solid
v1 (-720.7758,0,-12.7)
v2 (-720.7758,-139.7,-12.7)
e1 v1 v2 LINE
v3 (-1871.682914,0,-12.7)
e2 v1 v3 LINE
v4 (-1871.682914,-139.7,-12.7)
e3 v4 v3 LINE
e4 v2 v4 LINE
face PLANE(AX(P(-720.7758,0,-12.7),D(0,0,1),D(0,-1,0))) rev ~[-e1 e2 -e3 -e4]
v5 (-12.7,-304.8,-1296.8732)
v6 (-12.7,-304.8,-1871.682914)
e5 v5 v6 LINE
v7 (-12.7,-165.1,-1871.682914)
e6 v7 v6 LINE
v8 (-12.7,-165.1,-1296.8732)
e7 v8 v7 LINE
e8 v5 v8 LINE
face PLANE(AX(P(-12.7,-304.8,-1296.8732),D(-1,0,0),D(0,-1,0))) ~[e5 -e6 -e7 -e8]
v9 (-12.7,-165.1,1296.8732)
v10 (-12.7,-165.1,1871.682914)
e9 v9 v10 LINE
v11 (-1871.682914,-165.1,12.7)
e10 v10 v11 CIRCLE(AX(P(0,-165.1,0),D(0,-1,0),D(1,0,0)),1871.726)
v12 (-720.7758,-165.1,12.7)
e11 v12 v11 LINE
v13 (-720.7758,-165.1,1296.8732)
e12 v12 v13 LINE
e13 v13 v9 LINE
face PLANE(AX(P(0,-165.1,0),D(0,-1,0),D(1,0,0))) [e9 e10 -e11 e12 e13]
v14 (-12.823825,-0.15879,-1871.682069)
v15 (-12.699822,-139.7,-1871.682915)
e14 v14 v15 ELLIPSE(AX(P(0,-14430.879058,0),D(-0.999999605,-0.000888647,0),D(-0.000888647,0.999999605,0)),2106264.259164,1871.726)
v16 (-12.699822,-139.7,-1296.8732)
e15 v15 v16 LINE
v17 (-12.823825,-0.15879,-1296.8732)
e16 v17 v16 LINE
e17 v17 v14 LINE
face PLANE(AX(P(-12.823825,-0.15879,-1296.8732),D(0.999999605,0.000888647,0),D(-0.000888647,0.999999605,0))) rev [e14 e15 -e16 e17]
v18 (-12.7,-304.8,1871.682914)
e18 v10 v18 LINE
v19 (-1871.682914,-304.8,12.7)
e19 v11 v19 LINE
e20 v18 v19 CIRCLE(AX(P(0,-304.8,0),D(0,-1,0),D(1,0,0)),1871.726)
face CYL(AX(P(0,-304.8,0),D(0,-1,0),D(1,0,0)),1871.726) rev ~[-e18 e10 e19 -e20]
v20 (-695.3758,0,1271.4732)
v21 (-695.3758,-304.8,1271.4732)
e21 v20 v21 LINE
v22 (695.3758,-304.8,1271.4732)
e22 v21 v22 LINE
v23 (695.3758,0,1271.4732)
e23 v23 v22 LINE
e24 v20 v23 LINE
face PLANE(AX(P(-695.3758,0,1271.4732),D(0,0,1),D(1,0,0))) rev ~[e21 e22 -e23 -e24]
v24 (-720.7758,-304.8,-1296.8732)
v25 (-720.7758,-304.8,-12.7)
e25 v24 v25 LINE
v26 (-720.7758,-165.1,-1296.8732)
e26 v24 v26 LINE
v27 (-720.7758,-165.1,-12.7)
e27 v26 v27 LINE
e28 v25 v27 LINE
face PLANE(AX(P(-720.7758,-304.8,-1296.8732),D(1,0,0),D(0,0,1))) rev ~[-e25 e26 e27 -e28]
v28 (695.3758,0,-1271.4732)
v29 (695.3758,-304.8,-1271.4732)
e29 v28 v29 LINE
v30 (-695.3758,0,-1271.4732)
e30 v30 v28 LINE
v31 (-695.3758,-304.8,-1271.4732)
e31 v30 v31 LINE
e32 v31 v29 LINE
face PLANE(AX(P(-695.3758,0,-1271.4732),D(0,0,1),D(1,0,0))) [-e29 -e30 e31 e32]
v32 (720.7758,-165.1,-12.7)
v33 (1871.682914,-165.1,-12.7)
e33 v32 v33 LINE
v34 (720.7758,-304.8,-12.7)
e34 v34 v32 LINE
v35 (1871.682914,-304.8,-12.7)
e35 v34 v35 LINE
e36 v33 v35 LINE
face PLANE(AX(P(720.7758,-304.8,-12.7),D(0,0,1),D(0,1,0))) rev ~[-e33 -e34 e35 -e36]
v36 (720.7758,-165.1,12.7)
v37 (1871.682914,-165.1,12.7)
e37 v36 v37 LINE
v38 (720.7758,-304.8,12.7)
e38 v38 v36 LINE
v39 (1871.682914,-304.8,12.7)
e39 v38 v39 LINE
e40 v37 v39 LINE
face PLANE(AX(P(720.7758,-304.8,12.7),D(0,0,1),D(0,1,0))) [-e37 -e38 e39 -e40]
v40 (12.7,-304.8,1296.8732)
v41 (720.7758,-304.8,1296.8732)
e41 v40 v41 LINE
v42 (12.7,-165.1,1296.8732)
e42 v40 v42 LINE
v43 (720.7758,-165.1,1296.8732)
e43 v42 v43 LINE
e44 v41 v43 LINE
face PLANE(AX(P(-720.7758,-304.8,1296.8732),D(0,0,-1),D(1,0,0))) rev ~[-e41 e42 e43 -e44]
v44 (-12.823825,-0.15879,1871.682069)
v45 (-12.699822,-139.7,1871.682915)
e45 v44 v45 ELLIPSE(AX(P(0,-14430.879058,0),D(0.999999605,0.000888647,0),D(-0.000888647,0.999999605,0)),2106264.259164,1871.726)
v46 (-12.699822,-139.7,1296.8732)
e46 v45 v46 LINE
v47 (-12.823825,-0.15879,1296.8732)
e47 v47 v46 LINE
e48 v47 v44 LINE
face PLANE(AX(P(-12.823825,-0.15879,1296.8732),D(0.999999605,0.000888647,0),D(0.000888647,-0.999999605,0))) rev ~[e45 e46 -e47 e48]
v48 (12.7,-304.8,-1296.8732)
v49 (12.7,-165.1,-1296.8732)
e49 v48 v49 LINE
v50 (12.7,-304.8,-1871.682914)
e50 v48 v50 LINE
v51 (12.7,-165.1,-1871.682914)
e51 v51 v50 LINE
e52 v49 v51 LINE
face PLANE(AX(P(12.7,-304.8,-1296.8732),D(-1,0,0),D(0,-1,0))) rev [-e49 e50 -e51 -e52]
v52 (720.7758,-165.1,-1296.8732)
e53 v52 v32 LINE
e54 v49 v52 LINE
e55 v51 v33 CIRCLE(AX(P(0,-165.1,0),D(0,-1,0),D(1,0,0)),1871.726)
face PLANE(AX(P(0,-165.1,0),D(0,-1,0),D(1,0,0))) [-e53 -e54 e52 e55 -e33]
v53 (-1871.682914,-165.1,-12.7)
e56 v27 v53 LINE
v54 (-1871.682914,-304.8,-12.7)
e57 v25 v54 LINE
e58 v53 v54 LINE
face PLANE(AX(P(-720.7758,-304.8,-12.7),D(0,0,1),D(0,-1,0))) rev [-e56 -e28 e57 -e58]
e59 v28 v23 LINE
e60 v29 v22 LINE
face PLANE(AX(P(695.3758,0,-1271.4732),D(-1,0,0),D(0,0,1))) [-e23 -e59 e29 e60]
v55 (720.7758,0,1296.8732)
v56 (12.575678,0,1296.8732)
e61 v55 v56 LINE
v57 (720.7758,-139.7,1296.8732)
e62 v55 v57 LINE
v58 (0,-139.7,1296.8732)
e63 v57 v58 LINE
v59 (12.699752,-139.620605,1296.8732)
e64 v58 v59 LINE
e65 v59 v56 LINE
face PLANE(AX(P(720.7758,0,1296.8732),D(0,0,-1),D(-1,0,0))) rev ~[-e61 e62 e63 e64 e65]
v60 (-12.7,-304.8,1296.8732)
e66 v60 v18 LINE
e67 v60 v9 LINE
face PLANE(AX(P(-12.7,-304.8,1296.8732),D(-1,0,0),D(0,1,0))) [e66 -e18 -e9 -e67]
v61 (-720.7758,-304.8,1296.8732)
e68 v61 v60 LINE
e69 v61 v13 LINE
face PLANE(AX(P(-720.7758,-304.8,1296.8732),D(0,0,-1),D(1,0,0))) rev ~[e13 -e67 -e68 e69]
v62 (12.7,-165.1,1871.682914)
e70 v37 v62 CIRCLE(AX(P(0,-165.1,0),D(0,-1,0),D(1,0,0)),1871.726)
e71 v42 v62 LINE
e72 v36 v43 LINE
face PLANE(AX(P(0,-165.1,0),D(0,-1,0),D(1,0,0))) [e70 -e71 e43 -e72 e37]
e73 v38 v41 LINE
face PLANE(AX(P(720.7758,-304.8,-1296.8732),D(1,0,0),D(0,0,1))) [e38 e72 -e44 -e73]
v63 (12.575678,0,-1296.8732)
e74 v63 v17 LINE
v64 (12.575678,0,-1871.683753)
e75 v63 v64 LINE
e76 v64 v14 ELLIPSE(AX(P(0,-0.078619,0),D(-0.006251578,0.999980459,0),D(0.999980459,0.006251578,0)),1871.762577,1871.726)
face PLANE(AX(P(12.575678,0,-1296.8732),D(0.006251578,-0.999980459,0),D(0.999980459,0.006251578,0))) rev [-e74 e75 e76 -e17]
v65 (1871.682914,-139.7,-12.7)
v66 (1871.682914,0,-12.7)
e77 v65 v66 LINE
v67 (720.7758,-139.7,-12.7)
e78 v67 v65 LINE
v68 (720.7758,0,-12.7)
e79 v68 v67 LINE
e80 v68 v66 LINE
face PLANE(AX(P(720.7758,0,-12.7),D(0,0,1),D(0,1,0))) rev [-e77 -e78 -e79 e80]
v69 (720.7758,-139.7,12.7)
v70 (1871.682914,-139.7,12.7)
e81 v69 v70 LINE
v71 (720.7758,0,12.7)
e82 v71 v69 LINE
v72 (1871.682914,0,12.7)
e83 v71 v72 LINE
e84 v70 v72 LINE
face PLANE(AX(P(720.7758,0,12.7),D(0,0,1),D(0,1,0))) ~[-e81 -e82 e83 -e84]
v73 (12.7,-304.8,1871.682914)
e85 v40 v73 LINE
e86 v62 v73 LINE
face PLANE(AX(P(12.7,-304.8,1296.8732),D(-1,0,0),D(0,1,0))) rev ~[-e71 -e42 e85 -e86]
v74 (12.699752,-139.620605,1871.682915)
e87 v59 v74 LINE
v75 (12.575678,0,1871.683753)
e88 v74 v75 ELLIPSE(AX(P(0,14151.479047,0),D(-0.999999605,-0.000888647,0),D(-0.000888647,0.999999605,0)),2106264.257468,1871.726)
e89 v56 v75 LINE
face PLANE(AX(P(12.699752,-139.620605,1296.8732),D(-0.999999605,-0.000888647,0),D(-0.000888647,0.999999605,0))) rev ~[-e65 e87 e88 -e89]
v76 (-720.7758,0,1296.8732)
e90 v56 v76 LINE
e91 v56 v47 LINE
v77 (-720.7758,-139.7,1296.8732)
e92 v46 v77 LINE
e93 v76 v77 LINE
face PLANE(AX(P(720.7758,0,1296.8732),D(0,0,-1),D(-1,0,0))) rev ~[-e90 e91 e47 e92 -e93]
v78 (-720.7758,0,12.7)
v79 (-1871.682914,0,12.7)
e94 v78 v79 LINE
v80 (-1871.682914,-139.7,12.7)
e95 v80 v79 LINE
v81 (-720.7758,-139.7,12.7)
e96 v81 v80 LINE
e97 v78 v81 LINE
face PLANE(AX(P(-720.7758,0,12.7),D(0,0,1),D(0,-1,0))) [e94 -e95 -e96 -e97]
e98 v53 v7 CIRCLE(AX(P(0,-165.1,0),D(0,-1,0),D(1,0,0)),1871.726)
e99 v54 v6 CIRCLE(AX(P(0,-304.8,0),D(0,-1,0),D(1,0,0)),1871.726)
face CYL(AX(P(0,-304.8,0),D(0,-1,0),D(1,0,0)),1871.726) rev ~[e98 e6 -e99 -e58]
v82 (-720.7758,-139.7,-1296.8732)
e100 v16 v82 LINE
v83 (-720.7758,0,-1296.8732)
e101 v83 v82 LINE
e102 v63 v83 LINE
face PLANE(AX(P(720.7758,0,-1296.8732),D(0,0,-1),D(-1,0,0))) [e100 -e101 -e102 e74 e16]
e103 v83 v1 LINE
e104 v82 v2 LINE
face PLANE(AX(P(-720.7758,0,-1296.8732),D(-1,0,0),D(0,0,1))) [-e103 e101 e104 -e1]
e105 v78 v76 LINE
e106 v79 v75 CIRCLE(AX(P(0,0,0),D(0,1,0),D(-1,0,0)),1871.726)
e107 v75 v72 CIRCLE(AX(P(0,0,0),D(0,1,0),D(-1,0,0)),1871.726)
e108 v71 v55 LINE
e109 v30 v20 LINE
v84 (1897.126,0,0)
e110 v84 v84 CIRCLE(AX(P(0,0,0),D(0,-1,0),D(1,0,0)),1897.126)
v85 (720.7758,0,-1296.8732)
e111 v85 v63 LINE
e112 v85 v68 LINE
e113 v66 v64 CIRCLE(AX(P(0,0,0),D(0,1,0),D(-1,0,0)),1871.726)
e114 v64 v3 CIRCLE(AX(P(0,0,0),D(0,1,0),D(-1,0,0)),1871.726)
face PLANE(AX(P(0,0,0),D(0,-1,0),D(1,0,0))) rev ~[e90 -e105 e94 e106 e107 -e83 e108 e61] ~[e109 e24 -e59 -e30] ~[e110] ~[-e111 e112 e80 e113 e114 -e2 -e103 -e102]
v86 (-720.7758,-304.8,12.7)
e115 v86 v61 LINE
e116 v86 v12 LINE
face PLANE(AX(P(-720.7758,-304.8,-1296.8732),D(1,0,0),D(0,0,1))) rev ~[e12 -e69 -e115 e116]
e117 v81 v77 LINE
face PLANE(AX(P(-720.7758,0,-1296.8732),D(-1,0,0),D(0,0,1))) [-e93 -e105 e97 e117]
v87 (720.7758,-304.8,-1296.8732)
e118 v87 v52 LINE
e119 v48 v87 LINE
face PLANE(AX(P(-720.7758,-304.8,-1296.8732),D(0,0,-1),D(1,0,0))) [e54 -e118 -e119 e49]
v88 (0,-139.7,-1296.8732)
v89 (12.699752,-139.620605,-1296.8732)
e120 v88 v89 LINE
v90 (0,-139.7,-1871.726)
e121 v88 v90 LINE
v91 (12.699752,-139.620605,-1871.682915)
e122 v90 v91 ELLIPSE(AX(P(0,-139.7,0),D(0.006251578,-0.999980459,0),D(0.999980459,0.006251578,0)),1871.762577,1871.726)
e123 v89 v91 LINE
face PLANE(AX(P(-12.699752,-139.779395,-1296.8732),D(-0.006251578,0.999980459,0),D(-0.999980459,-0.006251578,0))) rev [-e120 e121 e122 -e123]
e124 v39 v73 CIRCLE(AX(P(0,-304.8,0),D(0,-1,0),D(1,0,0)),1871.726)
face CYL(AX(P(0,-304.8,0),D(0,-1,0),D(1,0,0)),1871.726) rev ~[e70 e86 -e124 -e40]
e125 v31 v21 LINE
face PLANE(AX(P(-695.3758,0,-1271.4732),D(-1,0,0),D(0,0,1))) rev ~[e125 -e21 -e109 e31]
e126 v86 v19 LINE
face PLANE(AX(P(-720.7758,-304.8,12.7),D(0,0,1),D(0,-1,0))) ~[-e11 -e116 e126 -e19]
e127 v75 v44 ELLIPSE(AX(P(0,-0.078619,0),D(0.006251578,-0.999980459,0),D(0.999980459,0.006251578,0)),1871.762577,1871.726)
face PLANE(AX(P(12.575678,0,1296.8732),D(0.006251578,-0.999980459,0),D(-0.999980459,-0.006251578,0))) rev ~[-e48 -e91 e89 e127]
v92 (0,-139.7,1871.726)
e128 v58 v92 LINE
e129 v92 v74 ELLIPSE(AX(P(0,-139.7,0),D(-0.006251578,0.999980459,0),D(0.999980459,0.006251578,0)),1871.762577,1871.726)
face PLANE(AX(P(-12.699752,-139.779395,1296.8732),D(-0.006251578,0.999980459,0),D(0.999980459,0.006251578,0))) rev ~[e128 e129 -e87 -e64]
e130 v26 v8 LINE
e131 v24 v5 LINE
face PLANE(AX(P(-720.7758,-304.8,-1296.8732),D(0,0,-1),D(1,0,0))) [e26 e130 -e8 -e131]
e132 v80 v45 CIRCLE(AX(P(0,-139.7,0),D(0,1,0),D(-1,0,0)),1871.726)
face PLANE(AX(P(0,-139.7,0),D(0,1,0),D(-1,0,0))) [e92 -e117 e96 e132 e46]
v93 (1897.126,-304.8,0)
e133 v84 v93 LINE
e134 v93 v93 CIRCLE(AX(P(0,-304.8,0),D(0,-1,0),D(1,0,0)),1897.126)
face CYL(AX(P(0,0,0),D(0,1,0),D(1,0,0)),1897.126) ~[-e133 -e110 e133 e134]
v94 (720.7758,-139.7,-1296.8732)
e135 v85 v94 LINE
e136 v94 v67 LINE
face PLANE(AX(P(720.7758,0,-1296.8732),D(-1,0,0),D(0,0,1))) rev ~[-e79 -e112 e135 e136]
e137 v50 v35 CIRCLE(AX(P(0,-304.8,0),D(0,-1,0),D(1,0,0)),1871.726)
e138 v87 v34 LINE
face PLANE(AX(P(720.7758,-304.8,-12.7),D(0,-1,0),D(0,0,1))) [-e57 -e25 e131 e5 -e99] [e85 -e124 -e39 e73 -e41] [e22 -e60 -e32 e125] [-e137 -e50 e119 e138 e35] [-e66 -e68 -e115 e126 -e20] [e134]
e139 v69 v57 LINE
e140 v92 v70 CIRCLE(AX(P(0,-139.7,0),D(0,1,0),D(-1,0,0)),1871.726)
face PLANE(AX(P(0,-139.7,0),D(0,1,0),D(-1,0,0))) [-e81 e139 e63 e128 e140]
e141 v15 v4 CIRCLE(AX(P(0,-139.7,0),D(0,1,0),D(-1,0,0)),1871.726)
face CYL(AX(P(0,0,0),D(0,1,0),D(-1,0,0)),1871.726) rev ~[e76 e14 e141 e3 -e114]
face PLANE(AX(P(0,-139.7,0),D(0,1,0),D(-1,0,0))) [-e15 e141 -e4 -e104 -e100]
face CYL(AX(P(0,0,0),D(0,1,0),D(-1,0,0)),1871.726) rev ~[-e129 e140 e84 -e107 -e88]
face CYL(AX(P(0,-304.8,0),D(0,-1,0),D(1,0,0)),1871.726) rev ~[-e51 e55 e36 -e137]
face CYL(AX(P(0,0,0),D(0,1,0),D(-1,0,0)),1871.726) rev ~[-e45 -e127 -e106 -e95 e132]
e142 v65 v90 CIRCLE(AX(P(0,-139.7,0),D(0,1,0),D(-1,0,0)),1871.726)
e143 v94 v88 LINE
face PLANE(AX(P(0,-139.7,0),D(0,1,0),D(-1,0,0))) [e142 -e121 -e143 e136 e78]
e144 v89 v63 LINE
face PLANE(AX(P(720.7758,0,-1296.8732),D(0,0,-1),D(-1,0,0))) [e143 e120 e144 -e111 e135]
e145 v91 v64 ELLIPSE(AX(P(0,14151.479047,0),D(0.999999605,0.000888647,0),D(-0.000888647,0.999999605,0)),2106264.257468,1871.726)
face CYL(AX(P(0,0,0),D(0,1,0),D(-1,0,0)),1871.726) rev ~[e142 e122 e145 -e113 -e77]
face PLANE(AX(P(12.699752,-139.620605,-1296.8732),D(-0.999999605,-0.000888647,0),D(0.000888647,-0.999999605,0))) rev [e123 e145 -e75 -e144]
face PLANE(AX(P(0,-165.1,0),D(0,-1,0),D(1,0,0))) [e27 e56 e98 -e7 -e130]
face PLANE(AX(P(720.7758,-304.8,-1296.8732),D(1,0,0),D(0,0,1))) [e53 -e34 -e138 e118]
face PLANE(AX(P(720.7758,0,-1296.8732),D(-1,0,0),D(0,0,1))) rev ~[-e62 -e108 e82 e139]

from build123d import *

# Parameters (mm, degrees)
F0_R     = 1897.126
F0_W     = 1390.7516
F0_H     = 2542.9464
F1_DEPTH = 304.8
F2_R     = 1871.726
F2_W     = 1441.5516
F2_H     = 2593.7464
F3_DEPTH = 139.7
F4_R     = 1871.726
F4_W     = 1441.5516
F4_H     = 2593.7464
F5_DEPTH = 139.7
F6_W     = 139.7
F6_H     = 25.4
F9_W     = 25.4
F9_H     = 139.7


# Not quite as in the source:
# - a feature of the source that left no trace in its solid (it failed there, or was rolled back) is left out
# - a pattern or mirror of a feature is missing from the dataset's text; its kind, count and spacing are read off the source's solid


with BuildPart() as f1:
    # F0 (on Front) → F1 (new body)
    with BuildSketch(Plane.XZ):
        Circle(F0_R)
        Rectangle(F0_W, F0_H, mode=Mode.SUBTRACT)
    extrude(amount=F1_DEPTH)

    # F2 (on face) → F3 (cut)
    with BuildSketch(Plane.XZ.offset(304.8)):
        Circle(F2_R)
        Rectangle(F2_W, F2_H, mode=Mode.SUBTRACT)
    extrude(amount=-F3_DEPTH, mode=Mode.SUBTRACT)

    # F4 (on face) → F5 (cut)
    with BuildSketch(Plane(origin=(0, 0, 0), x_dir=(-1, 0, 0), z_dir=(0, 1, 0))):
        Circle(F4_R)
        Rectangle(F4_W, F4_H, mode=Mode.SUBTRACT)
    extrude(amount=-F5_DEPTH, mode=Mode.SUBTRACT)

    # F6 (on face) → F7 (join, up to the next surface of F1)
    with BuildSketch(Plane.YZ.offset(720.7758)):
        with Locations((-234.95, 0)):
            Rectangle(F6_W, F6_H)
    f7 = extrude(until=Until.NEXT)

    # F7_copies: F7 across plane
    add(f7.mirror(Plane.ZX.offset(-152.4)))

    # F8: F1 across plane


with BuildPart() as f1_1:
    add(f1.part)
    add(f1.part.mirror(Plane.YZ))

    # F9 (on face) → F10 (join, up to the next surface of F1)
    with BuildSketch(Plane.XY.offset(1296.8732)):
        with Locations((0, -234.95)):
            Rectangle(F9_W, F9_H)
    extrude(until=Until.NEXT)

    # F11: F1 across plane


with BuildPart() as f1_2:
    add(f1_1.part)
    add(f1_1.part.mirror(Plane.XY))

    # F12 (on face) → F13 (join, up to the next surface of F1)
    with BuildSketch(Plane.XY.offset(1296.8732)):
        Polygon((12.6997518255, -139.6206049634), (12.5756783059, 0), (-12.823825345, -0.1587900733), (-12.6997518255, -139.7793950366), align=None)
    extrude(until=Until.NEXT)

    # F14: F1 across plane


with BuildPart() as f1_3:
    add(f1_2.part)
    add(f1_2.part.mirror(Plane.XY))


solid = f1_3.part
